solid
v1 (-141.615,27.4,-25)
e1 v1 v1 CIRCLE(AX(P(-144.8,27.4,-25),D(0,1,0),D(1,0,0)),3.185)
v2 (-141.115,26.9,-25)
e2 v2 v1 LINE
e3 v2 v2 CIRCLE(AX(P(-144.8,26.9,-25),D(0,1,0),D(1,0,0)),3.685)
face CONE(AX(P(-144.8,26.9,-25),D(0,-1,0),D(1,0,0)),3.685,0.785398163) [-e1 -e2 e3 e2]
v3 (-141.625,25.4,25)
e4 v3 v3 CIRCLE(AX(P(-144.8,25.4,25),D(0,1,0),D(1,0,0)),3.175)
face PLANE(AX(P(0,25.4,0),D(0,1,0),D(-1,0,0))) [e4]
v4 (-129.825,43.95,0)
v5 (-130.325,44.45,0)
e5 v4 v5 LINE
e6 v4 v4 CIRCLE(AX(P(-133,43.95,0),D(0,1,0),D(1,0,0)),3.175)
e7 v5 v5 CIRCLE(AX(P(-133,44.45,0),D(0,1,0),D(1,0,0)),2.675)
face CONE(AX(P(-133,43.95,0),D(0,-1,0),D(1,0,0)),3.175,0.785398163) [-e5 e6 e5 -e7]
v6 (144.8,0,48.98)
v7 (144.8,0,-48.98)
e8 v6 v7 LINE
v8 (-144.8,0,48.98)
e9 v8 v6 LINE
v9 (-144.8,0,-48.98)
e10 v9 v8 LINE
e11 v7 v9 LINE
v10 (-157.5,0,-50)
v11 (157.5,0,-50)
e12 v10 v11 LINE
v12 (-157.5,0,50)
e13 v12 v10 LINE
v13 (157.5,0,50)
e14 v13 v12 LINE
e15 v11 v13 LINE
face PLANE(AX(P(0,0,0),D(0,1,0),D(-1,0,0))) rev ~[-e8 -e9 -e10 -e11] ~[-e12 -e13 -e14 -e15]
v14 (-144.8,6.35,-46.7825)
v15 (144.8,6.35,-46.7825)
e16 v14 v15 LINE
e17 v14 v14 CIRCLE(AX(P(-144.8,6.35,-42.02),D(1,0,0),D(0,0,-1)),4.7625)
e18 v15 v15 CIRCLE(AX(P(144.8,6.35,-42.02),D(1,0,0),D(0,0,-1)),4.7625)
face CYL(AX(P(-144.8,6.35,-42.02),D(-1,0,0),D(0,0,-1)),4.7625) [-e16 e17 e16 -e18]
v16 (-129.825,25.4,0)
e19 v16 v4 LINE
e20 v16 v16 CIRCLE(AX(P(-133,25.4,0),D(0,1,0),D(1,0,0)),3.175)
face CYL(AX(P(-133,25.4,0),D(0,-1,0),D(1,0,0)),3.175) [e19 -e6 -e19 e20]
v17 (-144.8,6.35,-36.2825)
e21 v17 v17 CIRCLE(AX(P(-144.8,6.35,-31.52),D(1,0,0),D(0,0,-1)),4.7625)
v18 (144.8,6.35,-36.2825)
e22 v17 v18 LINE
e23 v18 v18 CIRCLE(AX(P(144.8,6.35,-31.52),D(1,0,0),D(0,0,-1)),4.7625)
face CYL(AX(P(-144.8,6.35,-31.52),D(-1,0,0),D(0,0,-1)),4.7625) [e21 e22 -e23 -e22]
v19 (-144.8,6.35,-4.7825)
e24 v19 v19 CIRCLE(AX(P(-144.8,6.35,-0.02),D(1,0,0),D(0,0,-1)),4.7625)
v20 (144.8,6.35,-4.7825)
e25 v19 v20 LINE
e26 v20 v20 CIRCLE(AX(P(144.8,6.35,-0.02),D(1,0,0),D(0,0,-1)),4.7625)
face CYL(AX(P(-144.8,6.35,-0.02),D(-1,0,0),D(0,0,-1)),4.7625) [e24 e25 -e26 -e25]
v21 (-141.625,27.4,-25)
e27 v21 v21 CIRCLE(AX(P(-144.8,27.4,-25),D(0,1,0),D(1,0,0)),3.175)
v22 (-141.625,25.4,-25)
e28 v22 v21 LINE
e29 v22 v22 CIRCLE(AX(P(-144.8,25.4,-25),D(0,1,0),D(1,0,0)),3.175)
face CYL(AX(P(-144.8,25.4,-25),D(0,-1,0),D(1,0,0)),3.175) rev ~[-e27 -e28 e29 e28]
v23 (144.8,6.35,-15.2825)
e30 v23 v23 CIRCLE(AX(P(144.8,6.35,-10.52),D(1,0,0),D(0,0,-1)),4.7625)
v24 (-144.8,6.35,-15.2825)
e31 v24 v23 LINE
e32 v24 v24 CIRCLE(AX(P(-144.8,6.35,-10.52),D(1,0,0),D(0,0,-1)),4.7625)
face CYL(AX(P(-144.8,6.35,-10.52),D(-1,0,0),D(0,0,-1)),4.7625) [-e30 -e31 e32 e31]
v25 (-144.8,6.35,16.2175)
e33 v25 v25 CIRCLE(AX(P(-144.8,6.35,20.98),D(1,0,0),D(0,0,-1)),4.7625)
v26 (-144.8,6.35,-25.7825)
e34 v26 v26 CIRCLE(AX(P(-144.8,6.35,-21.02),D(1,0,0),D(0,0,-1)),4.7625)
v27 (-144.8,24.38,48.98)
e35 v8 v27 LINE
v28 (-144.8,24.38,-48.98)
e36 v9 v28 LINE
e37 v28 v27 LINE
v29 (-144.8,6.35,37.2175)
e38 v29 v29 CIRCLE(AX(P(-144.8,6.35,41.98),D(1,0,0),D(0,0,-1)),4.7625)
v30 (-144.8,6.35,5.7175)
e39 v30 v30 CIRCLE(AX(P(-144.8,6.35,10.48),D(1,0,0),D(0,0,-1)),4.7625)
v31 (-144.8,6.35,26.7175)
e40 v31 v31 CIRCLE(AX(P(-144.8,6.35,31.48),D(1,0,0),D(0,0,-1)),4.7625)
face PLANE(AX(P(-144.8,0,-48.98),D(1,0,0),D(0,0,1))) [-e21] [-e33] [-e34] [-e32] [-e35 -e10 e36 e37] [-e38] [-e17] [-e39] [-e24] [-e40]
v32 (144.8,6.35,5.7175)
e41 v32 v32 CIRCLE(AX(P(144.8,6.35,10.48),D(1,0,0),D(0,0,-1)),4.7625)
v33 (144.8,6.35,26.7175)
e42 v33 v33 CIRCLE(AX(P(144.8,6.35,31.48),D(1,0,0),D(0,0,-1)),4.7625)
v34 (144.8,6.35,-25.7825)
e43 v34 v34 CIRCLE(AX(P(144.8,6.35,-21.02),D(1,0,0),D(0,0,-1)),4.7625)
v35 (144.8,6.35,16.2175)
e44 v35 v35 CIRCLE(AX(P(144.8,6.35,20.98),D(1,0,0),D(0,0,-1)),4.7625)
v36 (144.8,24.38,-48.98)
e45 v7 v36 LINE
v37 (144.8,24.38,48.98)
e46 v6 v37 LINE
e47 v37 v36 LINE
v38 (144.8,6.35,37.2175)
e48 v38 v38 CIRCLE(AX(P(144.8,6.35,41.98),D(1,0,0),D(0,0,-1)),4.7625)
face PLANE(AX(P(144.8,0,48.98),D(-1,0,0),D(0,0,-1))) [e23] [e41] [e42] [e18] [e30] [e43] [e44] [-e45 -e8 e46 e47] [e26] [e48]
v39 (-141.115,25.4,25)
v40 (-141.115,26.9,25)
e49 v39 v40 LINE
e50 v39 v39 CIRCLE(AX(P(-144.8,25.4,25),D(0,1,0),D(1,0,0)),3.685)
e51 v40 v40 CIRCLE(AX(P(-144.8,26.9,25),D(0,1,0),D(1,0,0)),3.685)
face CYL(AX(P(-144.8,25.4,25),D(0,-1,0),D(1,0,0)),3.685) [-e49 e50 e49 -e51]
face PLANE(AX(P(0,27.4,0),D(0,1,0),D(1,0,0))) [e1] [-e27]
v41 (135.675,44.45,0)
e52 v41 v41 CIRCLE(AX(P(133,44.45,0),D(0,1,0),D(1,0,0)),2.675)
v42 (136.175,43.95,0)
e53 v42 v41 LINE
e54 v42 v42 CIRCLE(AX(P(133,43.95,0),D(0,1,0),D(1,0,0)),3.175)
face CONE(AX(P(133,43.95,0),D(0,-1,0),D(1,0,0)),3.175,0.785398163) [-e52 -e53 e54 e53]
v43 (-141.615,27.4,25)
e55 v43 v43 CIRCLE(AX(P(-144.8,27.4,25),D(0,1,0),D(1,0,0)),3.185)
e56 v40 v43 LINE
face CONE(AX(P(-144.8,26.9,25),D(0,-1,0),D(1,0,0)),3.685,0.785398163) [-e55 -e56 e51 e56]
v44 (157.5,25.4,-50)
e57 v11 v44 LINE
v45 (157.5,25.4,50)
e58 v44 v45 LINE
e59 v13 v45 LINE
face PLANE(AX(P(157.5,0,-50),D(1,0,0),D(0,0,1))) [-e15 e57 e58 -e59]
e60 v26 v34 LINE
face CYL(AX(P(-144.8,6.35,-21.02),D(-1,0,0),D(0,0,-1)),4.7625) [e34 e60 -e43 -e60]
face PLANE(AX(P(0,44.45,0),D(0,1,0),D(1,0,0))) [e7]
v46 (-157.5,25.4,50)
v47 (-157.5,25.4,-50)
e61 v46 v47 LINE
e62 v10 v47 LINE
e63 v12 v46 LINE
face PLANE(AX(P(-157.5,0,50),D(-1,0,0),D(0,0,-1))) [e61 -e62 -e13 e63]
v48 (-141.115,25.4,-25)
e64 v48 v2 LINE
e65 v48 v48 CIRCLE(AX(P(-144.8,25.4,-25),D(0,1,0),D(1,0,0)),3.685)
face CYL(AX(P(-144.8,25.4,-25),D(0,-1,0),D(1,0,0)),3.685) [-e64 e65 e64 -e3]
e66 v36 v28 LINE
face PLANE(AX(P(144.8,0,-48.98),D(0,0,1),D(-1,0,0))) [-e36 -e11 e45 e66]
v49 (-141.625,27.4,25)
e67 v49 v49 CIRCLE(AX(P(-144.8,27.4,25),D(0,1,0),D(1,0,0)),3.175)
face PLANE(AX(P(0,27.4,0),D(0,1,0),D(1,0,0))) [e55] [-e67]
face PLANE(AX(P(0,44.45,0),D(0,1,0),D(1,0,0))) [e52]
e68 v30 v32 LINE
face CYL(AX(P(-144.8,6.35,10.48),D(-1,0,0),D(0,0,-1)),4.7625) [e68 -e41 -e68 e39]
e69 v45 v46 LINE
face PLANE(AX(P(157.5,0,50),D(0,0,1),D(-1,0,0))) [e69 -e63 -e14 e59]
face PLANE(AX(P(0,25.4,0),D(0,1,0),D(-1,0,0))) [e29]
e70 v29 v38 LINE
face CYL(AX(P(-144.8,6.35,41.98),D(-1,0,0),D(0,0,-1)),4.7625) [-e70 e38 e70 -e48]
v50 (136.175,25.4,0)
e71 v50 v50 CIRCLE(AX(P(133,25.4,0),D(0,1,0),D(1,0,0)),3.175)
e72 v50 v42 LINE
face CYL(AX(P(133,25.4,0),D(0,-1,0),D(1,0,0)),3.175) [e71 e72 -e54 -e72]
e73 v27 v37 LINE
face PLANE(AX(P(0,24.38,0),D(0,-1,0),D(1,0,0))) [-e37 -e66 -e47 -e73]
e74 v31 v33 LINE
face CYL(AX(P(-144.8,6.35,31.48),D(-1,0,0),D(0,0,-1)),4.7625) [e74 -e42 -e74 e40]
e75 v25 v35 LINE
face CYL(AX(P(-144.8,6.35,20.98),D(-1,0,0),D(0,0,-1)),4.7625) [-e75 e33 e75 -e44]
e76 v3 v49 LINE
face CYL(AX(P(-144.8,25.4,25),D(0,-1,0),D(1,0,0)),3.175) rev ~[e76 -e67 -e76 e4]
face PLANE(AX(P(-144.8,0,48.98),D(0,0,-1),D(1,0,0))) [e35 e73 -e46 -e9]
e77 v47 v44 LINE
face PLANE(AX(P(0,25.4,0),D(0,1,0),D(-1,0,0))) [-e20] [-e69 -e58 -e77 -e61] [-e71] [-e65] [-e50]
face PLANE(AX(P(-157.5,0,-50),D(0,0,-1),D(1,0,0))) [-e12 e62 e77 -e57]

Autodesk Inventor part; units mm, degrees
ref_plane "YZ Plane" through (0, 0, 0) normal (1, 0, 0) x (0, 1, 0)
ref_plane "XZ Plane" through (0, 0, 0) normal (0, 1, 0) x (-1, 0, 0)
ref_plane "XY Plane" through (0, 0, 0) normal (0, 0, 1) x (1, 0, 0)
sketch "Boceto1" plane through (0, 0, 0) normal (0, 1, 0) x (-1, 0, 0)
  line L0 (-157.5, 50) -> (157.5, 50)
  line L1 (157.5, 50) -> (157.5, -50)
  line L2 (157.5, -50) -> (-157.5, -50)
  line L3 (-157.5, -50) -> (-157.5, 50)
  line L4 (-157.5, 50) -> (157.5, -50) construction
  line L5 (157.5, 50) -> (-157.5, -50) construction
  point P0 (0, 0)
  dimension "d0" = 315
  dimension "d1" = 100
extrude "Extrusión1" add sketch "Boceto1" along normal blind 25.4
sketch "Boceto2" plane through (0, 0, 0) normal (0, -1, 0) x (1, 0, 0)
  line L0 (-144.8, 48.98) -> (144.8, 48.98)
  line L1 (144.8, -48.98) -> (-144.8, -48.98)
  line L2 (-144.8, -48.98) -> (-144.8, 48.98)
  line L3 (144.8, 48.98) -> (144.8, -48.98)
  line L4 (-157.5, -50) -> (-157.5, 50) projected
  line L5 (-157.5, 50) -> (157.5, 50) projected
  line L6 (157.5, 50) -> (157.5, -50) projected
  dimension "d8" = 12.7
  dimension "d9" = 1.02
  dimension "d52" = 12.7
extrude "Extrusión2" cut sketch "Boceto2" against normal blind 24.38
sketch "Boceto4" plane through (0, 25.4, 0) normal (0, 1, 0) x (1, 0, 0)
  line L0 (-157.5, 50) -> (-108.5, 50) construction
  line L1 (-108.5, 50) -> (-108.5, -50) construction
  line L2 (-157.5, -50) -> (157.5, -50) construction
  line L3 (-157.5, -50) -> (-108.5, 50) construction
  line L4 (-157.5, 50) -> (-108.5, -50) construction
  line L5 (157.5, 50) -> (-157.5, 50) construction
  line L6 (157.5, 50) -> (108.5, 50) construction
  line L7 (108.5, 50) -> (108.5, -50) construction
  line L8 (108.5, -50) -> (157.5, 50) construction
  line L9 (108.5, 50) -> (157.5, -50) construction
  circle A0 centre (-133, 0) radius 3.175
  circle A1 centre (133, 0) radius 3.175
  point P0 (0, 0)
  dimension "d24" = 49
  dimension "d25" = 49
  dimension "d26" = 6.35
  dimension "d27" = 6.35
extrude "Extrusión4" add sketch "Boceto4" along normal blind 19.05
thread "Rosca1" size "1/4-20 UNC" class "1A" standard "ANSI Unified Screw Threads" full length
thread "Rosca2" size "M7x1" class "6g" standard "ANSI Metric M Profile" full length
chamfer "Chaflán1" distance 0.5 angle 45 1 edges at (-136.175, 44.45, 0)
chamfer "Chaflán2" distance 0.5 angle 45 1 edges at (129.825, 44.45, 0)
sketch "Boceto6" plane through (-144.8, 0, 48.98) normal (1, 0, 0) x (0, 0, -1)
  circle A0 centre (7, 6.35) radius 4.7625
  line L0 (0, 0) -> (0, 24.38) projected
  line L1 (97.96, 0) -> (0, 0) projected
  circle A1 centre (17.5, 6.35) radius 4.7625
  circle A2 centre (28, 6.35) radius 4.7625
  circle A3 centre (38.5, 6.35) radius 4.7625
  circle A4 centre (49, 6.35) radius 4.7625
  circle A5 centre (59.5, 6.35) radius 4.7625
  circle A6 centre (70, 6.35) radius 4.7625
  circle A7 centre (80.5, 6.35) radius 4.7625
  circle A8 centre (91, 6.35) radius 4.7625
  point P0 (48.98, 0)
  dimension "d53" = 9.525
  dimension "d54" = 7
  dimension "d55" = 6.35
  dimension "d58" = 10.5
extrude "Extrusión6" add sketch "Boceto6" along normal up to surface (289.6 mm away)
sketch "Boceto7" plane through (0, 25.4, 0) normal (0, 1, 0) x (1, 0, 0)
  line L0 (-157.5, 50) -> (-157.5, -50) construction
  line L1 (-157.5, 0) -> (-144.8, 0) construction
  line L2 (-144.8, 0) -> (-144.8, 25) construction
  line L3 (-144.8, 48.98) -> (-144.8, -48.98) construction
  line L4 (-144.8, 0) -> (-144.8, -25) construction
  circle A0 centre (-144.8, -25) radius 3.175
  circle A1 centre (-144.8, 25) radius 3.175
  circle A2 centre (-144.8, -25) radius 3.685
  circle A3 centre (-144.8, 25) radius 3.685
  point P0 (0, 0)
  dimension "d67" = 12.7
  dimension "d68" = 25
  dimension "d69" = 25
  dimension "d70" = 6.35
  dimension "d71" = 6.35
  dimension "d72" = 7.37
  dimension "d73" = 7.37
extrude "Extrusión7" add sketch "Boceto7" along normal blind 2
chamfer "Chaflán4" distance 0.5 angle 45 2 edges at (-148.485, 27.4, 25) (-148.485, 27.4, -25)
sketch "Boceto8" plane through (-144.8, 25.4, -25) normal (0, 1, 0) x (1, 0, 0)
  circle A0 centre (0, 0) radius 3.175 projected
sketch "Boceto9" plane through (-144.8, 25.4, 25) normal (0, 1, 0) x (1, 0, 0)
  circle A0 centre (0, 0) radius 3.175 projected
properties part number "resistencia_cuarzo_550W"
